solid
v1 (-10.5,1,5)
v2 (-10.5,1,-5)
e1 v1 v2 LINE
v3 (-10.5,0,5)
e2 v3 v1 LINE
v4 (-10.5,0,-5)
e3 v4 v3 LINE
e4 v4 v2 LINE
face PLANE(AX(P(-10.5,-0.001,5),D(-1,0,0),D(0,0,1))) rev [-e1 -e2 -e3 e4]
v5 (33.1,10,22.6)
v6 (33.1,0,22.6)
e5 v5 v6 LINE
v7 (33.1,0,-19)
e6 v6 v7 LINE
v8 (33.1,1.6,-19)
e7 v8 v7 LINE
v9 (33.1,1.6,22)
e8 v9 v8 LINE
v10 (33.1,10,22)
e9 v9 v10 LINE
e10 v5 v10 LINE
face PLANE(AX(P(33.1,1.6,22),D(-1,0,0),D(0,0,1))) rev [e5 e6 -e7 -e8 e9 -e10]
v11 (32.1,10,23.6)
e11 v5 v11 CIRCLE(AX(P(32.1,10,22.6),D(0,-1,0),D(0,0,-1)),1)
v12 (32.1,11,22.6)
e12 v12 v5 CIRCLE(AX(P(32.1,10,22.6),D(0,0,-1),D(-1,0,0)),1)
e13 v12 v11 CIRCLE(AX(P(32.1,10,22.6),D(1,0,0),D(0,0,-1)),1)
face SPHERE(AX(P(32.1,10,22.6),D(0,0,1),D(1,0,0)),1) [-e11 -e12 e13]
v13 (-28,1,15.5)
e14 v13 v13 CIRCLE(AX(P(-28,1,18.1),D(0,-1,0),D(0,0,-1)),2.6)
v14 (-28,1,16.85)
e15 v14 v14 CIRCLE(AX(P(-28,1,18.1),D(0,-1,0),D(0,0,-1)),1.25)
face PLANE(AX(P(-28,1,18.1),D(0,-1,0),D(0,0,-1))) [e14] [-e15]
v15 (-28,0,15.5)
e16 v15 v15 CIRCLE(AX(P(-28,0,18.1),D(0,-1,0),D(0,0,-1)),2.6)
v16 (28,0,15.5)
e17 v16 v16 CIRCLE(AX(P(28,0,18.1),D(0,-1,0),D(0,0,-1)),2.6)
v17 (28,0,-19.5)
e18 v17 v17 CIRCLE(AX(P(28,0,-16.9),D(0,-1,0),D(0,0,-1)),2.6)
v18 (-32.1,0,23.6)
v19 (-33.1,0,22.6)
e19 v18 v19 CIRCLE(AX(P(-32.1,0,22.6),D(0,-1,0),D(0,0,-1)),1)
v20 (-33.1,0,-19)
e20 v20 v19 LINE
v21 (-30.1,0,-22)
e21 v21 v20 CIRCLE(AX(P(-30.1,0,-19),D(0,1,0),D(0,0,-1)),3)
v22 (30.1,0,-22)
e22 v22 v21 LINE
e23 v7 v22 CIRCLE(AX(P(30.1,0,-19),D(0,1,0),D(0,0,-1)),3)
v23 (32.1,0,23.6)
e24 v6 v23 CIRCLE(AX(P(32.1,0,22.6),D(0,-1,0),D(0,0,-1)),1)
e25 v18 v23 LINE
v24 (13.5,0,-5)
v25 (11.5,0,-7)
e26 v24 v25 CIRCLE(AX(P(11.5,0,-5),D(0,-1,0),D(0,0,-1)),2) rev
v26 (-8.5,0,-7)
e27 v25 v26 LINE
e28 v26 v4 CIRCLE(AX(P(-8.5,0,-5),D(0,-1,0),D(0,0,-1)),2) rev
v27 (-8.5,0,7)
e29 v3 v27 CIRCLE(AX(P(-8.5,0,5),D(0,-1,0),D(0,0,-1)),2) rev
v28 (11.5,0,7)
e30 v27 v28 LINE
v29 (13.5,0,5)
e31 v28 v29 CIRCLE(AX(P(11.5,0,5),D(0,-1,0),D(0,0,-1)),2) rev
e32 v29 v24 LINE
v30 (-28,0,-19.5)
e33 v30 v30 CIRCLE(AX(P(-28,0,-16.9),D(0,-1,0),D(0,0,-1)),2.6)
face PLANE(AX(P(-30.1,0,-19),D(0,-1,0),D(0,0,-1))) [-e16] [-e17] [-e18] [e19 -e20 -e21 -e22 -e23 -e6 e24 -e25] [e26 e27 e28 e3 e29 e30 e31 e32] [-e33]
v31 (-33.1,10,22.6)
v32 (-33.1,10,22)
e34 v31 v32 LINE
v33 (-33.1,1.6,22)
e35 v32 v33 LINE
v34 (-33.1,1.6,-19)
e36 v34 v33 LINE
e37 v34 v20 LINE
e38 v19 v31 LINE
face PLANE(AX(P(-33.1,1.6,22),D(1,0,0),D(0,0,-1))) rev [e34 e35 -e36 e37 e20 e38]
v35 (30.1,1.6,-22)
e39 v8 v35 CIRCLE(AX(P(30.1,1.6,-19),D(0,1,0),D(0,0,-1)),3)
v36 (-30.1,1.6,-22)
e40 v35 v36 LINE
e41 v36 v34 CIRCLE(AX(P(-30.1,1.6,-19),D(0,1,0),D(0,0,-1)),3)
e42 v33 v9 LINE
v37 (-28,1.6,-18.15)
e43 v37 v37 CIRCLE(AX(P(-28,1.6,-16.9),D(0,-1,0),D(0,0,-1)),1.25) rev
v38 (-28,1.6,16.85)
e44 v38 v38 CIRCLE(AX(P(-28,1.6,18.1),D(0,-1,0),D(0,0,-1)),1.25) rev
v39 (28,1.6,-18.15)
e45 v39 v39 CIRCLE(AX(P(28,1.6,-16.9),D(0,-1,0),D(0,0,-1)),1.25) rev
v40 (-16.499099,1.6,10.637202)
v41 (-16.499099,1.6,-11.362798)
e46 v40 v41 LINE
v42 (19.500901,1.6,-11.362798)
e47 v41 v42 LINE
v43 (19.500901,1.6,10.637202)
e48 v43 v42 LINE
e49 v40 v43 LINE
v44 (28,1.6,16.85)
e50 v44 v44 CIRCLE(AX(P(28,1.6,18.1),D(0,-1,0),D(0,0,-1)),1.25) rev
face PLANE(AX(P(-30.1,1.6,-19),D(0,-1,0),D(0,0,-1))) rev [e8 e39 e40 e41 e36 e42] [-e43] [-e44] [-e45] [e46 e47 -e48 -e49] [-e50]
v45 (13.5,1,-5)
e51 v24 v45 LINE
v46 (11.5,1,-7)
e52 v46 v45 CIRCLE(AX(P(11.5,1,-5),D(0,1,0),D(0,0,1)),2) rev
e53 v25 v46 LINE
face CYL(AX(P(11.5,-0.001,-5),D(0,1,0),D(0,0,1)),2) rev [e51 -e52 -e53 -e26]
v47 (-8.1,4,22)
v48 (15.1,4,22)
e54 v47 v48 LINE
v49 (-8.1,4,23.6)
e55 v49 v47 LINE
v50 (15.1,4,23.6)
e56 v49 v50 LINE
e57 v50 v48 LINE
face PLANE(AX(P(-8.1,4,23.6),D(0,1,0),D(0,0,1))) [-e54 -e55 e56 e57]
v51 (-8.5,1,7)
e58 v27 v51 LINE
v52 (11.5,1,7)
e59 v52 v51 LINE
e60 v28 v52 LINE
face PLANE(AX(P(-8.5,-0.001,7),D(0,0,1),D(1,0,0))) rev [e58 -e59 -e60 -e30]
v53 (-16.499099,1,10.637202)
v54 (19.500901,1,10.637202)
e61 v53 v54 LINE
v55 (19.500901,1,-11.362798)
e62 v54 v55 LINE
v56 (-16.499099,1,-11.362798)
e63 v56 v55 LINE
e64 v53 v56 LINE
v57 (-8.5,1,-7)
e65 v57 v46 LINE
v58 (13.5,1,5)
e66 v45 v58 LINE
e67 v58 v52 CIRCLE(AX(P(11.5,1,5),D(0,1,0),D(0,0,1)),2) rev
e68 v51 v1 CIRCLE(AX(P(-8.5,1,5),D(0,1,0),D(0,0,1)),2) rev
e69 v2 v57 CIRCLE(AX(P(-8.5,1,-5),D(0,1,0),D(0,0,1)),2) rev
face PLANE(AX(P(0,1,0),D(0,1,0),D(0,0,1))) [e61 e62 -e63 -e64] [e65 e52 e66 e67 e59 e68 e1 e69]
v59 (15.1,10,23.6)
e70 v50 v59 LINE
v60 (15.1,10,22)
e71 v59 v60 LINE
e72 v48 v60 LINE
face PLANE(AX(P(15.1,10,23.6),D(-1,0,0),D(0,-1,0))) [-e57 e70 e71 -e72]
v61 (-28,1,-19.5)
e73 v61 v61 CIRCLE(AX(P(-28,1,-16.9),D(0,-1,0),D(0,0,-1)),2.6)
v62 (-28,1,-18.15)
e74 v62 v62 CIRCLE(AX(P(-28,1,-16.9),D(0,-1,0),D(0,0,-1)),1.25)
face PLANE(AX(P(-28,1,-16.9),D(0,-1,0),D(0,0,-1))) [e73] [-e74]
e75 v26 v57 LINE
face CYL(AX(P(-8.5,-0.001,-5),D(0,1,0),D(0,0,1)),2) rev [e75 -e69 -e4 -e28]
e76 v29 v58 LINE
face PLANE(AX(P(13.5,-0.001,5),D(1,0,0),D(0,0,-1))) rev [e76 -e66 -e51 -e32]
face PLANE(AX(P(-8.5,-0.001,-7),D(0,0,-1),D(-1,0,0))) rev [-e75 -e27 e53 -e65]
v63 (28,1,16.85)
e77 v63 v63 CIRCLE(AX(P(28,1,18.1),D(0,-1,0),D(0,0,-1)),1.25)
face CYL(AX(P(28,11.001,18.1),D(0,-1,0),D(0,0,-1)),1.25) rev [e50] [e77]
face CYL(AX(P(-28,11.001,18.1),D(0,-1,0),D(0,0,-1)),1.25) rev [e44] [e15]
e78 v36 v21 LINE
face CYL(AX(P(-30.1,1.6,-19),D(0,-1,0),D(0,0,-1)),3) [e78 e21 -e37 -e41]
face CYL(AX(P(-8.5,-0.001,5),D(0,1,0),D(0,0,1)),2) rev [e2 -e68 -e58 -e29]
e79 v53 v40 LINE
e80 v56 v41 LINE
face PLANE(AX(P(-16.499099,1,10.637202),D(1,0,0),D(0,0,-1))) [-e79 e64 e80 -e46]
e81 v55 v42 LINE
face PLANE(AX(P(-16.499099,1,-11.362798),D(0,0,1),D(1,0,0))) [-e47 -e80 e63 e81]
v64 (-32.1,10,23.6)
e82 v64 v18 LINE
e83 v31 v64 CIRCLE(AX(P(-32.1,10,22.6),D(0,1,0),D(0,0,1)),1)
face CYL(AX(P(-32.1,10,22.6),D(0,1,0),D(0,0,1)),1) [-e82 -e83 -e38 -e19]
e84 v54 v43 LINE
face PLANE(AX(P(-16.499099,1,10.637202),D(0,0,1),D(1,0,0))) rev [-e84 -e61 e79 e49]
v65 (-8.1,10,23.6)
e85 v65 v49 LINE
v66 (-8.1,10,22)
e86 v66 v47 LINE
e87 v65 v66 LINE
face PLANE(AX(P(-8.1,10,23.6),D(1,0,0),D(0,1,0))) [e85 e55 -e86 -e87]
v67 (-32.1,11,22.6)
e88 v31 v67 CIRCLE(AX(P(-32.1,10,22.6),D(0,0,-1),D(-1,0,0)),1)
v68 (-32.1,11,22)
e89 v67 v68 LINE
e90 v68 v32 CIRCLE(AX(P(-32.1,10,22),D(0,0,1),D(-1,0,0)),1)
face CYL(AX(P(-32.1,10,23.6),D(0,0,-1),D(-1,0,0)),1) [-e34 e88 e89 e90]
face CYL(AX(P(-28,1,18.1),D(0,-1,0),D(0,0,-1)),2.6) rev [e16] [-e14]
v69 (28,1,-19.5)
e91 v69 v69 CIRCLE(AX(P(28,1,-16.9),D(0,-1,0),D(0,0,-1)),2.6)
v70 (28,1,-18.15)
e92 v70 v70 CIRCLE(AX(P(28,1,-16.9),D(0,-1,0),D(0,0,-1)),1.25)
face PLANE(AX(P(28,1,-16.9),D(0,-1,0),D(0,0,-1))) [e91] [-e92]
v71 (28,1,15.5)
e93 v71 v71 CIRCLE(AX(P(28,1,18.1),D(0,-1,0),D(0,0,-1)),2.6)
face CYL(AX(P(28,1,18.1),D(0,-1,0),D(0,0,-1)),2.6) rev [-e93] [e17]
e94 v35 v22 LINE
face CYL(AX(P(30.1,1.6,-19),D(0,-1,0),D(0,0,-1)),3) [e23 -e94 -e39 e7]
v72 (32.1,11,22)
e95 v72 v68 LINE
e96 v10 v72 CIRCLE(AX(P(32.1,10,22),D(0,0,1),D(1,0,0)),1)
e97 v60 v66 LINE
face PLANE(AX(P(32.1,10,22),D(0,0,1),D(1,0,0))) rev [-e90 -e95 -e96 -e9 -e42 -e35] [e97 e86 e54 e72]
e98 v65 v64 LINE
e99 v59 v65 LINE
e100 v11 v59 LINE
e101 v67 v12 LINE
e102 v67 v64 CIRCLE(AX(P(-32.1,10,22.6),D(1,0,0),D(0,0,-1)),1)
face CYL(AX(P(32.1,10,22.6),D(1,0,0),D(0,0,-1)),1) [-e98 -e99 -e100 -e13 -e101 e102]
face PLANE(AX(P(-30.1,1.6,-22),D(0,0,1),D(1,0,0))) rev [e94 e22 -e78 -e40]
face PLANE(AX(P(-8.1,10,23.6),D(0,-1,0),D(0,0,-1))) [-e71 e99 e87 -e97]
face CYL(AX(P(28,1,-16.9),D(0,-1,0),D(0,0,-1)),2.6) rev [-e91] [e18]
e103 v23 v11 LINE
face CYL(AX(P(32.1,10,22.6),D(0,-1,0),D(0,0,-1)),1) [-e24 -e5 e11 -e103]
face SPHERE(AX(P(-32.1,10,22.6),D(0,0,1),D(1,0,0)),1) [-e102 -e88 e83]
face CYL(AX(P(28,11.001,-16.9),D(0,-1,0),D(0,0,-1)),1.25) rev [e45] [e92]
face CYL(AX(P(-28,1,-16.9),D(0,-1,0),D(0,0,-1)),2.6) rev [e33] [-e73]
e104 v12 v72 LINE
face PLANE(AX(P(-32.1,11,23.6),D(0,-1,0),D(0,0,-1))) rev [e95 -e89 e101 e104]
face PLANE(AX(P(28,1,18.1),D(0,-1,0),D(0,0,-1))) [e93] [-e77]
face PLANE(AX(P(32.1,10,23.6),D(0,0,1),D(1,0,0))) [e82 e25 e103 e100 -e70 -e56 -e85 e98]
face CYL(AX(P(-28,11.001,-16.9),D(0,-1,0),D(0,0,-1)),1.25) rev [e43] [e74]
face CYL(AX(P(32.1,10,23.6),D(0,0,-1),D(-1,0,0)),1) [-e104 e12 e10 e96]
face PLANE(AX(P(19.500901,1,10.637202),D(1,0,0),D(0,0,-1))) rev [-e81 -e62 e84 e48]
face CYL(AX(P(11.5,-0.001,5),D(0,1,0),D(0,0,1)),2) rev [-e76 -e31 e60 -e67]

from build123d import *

# Parameters (mm, degrees)
EXTRUDE_1_DEPTH        = 1.6
SKETCH_2_W             = 23.2
SKETCH_2_H             = 6
EXTRUDE_719_DEPTH      = 1.6
CUT_EXTRUDE_1150_REACH = 43.724
SKETCH_5_R             = 2.6
CUT_EXTRUDE_1612_DEPTH = 1
CUT_EXTRUDE_1748_REACH = 43.864
SKETCH_7_R             = 1.25
SKETCH_9_W             = 36
SKETCH_9_H             = 22
CUT_EXTRUDE_2286_DEPTH = 0.6
FILLET_2_R             = 1


with BuildPart() as part:
    # 草图1 → 凸台-拉伸1 (new body)
    with BuildSketch(Plane(origin=(0, 0, 0), x_dir=(1, 0, 0), z_dir=(0, 1, 0))):
        with BuildLine():
            Line((-33.1, -22), (33.1, -22))
            Line((33.1, -22), (33.1, 19))
            ThreePointArc((33.1, 19), (32.221320344, 21.121320344), (30.1, 22))
            Line((30.1, 22), (-30.1, 22))
            ThreePointArc((-30.1, 22), (-32.221320344, 21.121320344), (-33.1, 19))
            Line((-33.1, 19), (-33.1, -22))
        make_face()
    extrude(amount=EXTRUDE_1_DEPTH)

    # 草图2 → Extrude 719 (add)
    with BuildSketch(Plane.XY.offset(22)):
        with BuildLine():
            Line((-33.1, 0), (33.1, 0))
            Line((33.1, 0), (33.1, 10))
            ThreePointArc((33.1, 10), (32.807106781, 10.707106781), (32.1, 11))
            Line((32.1, 11), (17.1, 11))
            Line((17.1, 11), (-9.1, 11))
            Line((-9.1, 11), (-32.1, 11))
            ThreePointArc((-32.1, 11), (-32.807106781, 10.707106781), (-33.1, 10))
            Line((-33.1, 10), (-33.1, 0))
        make_face()
        with Locations((3.5, 7)):
            Rectangle(SKETCH_2_W, SKETCH_2_H, mode=Mode.SUBTRACT)
    extrude(amount=EXTRUDE_719_DEPTH)

    # 草图3 → Cut-Extrude 1150 (cut, up to next)
    with BuildSketch(Plane(origin=(0, 1.6, 0), x_dir=(1, 0, 0), z_dir=(0, 1, 0)), mode=Mode.PRIVATE) as cut_extrude_1150_sk1:
        with BuildLine():
            Line((-8.5, -7), (11.5, -7))
            ThreePointArc((11.5, -7), (12.914213562, -6.414213562), (13.5, -5))
            Line((13.5, -5), (13.5, 5))
            ThreePointArc((13.5, 5), (12.914213562, 6.414213562), (11.5, 7))
            Line((11.5, 7), (-8.5, 7))
            ThreePointArc((-8.5, 7), (-9.914213562, 6.414213562), (-10.5, 5))
            Line((-10.5, 5), (-10.5, -5))
            ThreePointArc((-10.5, -5), (-9.914213562, -6.414213562), (-8.5, -7))
        make_face()
    cut_extrude_1150_tool1 = extrude(cut_extrude_1150_sk1.sketch, amount=-CUT_EXTRUDE_1150_REACH, mode=Mode.PRIVATE) & part.part
    add(cut_extrude_1150_tool1.solids().sort_by_distance((1.5, 1.6, 0))[0], mode=Mode.SUBTRACT)

    # 草图5 → Cut-Extrude 1612 (cut)
    with BuildSketch(Plane.XZ):
        with Locations(Location((-28, -16.9, 0), (0, 0, 270))):
            Circle(SKETCH_5_R)
        with Locations(Location((28, -16.9, 0), (0, 0, 270))):
            Circle(SKETCH_5_R)
        with Locations(Location((28, 18.1, 0), (0, 0, 270))):
            Circle(SKETCH_5_R)
        with Locations(Location((-28, 18.1, 0), (0, 0, 270))):
            Circle(SKETCH_5_R)
    extrude(amount=-CUT_EXTRUDE_1612_DEPTH, mode=Mode.SUBTRACT)

    # 草图7 → Cut-Extrude 1748 (cut, up to next)
    with BuildSketch(Plane.XZ.offset(-1), mode=Mode.PRIVATE) as cut_extrude_1748_sk1:
        with Locations(Location((-28, -16.9, 0), (0, 0, 270))):
            Circle(SKETCH_7_R)
    cut_extrude_1748_tool1 = extrude(cut_extrude_1748_sk1.sketch, amount=-CUT_EXTRUDE_1748_REACH, mode=Mode.PRIVATE) & part.part
    # 草图7 → Cut-Extrude 1748 (cut, up to next)
    with BuildSketch(Plane.XZ.offset(-1), mode=Mode.PRIVATE) as cut_extrude_1748_sk2:
        with Locations(Location((28, -16.9, 0), (0, 0, 270))):
            Circle(SKETCH_7_R)
    cut_extrude_1748_tool2 = extrude(cut_extrude_1748_sk2.sketch, amount=-CUT_EXTRUDE_1748_REACH, mode=Mode.PRIVATE) & part.part
    # 草图7 → Cut-Extrude 1748 (cut, up to next)
    with BuildSketch(Plane.XZ.offset(-1), mode=Mode.PRIVATE) as cut_extrude_1748_sk3:
        with Locations(Location((28, 18.1, 0), (0, 0, 270))):
            Circle(SKETCH_7_R)
    cut_extrude_1748_tool3 = extrude(cut_extrude_1748_sk3.sketch, amount=-CUT_EXTRUDE_1748_REACH, mode=Mode.PRIVATE) & part.part
    # 草图7 → Cut-Extrude 1748 (cut, up to next)
    with BuildSketch(Plane.XZ.offset(-1), mode=Mode.PRIVATE) as cut_extrude_1748_sk4:
        with Locations(Location((-28, 18.1, 0), (0, 0, 270))):
            Circle(SKETCH_7_R)
    cut_extrude_1748_tool4 = extrude(cut_extrude_1748_sk4.sketch, amount=-CUT_EXTRUDE_1748_REACH, mode=Mode.PRIVATE) & part.part
    add(cut_extrude_1748_tool1.solids().sort_by_distance((-28, 1, -16.9))[0], mode=Mode.SUBTRACT)
    add(cut_extrude_1748_tool2.solids().sort_by_distance((28, 1, -16.9))[0], mode=Mode.SUBTRACT)
    add(cut_extrude_1748_tool3.solids().sort_by_distance((28, 1, 18.1))[0], mode=Mode.SUBTRACT)
    add(cut_extrude_1748_tool4.solids().sort_by_distance((-28, 1, 18.1))[0], mode=Mode.SUBTRACT)

    # 草图9 → Cut-Extrude 2286 (cut)
    with BuildSketch(Plane(origin=(0, 1.6, 0), x_dir=(1, 0, 0), z_dir=(0, 1, 0))):
        with Locations((1.500900608, 0.362797629)):
            Rectangle(SKETCH_9_W, SKETCH_9_H)
    extrude(amount=-CUT_EXTRUDE_2286_DEPTH, mode=Mode.SUBTRACT)

    # 圆角2
    fillet_2_edges = [part.edges().sort_by_distance(p)[0] for p in [
        (32.807106781, 10.707106781, 23.6),
        (0, 11, 23.6),
        (-32.807106781, 10.707106781, 23.6),
        (-33.1, 5, 23.6),
        (33.1, 5, 23.6),
    ]]
    fillet(fillet_2_edges, radius=FILLET_2_R - 0.0001)  # a hair under: the kernel refuses the full size


solid = part.part
